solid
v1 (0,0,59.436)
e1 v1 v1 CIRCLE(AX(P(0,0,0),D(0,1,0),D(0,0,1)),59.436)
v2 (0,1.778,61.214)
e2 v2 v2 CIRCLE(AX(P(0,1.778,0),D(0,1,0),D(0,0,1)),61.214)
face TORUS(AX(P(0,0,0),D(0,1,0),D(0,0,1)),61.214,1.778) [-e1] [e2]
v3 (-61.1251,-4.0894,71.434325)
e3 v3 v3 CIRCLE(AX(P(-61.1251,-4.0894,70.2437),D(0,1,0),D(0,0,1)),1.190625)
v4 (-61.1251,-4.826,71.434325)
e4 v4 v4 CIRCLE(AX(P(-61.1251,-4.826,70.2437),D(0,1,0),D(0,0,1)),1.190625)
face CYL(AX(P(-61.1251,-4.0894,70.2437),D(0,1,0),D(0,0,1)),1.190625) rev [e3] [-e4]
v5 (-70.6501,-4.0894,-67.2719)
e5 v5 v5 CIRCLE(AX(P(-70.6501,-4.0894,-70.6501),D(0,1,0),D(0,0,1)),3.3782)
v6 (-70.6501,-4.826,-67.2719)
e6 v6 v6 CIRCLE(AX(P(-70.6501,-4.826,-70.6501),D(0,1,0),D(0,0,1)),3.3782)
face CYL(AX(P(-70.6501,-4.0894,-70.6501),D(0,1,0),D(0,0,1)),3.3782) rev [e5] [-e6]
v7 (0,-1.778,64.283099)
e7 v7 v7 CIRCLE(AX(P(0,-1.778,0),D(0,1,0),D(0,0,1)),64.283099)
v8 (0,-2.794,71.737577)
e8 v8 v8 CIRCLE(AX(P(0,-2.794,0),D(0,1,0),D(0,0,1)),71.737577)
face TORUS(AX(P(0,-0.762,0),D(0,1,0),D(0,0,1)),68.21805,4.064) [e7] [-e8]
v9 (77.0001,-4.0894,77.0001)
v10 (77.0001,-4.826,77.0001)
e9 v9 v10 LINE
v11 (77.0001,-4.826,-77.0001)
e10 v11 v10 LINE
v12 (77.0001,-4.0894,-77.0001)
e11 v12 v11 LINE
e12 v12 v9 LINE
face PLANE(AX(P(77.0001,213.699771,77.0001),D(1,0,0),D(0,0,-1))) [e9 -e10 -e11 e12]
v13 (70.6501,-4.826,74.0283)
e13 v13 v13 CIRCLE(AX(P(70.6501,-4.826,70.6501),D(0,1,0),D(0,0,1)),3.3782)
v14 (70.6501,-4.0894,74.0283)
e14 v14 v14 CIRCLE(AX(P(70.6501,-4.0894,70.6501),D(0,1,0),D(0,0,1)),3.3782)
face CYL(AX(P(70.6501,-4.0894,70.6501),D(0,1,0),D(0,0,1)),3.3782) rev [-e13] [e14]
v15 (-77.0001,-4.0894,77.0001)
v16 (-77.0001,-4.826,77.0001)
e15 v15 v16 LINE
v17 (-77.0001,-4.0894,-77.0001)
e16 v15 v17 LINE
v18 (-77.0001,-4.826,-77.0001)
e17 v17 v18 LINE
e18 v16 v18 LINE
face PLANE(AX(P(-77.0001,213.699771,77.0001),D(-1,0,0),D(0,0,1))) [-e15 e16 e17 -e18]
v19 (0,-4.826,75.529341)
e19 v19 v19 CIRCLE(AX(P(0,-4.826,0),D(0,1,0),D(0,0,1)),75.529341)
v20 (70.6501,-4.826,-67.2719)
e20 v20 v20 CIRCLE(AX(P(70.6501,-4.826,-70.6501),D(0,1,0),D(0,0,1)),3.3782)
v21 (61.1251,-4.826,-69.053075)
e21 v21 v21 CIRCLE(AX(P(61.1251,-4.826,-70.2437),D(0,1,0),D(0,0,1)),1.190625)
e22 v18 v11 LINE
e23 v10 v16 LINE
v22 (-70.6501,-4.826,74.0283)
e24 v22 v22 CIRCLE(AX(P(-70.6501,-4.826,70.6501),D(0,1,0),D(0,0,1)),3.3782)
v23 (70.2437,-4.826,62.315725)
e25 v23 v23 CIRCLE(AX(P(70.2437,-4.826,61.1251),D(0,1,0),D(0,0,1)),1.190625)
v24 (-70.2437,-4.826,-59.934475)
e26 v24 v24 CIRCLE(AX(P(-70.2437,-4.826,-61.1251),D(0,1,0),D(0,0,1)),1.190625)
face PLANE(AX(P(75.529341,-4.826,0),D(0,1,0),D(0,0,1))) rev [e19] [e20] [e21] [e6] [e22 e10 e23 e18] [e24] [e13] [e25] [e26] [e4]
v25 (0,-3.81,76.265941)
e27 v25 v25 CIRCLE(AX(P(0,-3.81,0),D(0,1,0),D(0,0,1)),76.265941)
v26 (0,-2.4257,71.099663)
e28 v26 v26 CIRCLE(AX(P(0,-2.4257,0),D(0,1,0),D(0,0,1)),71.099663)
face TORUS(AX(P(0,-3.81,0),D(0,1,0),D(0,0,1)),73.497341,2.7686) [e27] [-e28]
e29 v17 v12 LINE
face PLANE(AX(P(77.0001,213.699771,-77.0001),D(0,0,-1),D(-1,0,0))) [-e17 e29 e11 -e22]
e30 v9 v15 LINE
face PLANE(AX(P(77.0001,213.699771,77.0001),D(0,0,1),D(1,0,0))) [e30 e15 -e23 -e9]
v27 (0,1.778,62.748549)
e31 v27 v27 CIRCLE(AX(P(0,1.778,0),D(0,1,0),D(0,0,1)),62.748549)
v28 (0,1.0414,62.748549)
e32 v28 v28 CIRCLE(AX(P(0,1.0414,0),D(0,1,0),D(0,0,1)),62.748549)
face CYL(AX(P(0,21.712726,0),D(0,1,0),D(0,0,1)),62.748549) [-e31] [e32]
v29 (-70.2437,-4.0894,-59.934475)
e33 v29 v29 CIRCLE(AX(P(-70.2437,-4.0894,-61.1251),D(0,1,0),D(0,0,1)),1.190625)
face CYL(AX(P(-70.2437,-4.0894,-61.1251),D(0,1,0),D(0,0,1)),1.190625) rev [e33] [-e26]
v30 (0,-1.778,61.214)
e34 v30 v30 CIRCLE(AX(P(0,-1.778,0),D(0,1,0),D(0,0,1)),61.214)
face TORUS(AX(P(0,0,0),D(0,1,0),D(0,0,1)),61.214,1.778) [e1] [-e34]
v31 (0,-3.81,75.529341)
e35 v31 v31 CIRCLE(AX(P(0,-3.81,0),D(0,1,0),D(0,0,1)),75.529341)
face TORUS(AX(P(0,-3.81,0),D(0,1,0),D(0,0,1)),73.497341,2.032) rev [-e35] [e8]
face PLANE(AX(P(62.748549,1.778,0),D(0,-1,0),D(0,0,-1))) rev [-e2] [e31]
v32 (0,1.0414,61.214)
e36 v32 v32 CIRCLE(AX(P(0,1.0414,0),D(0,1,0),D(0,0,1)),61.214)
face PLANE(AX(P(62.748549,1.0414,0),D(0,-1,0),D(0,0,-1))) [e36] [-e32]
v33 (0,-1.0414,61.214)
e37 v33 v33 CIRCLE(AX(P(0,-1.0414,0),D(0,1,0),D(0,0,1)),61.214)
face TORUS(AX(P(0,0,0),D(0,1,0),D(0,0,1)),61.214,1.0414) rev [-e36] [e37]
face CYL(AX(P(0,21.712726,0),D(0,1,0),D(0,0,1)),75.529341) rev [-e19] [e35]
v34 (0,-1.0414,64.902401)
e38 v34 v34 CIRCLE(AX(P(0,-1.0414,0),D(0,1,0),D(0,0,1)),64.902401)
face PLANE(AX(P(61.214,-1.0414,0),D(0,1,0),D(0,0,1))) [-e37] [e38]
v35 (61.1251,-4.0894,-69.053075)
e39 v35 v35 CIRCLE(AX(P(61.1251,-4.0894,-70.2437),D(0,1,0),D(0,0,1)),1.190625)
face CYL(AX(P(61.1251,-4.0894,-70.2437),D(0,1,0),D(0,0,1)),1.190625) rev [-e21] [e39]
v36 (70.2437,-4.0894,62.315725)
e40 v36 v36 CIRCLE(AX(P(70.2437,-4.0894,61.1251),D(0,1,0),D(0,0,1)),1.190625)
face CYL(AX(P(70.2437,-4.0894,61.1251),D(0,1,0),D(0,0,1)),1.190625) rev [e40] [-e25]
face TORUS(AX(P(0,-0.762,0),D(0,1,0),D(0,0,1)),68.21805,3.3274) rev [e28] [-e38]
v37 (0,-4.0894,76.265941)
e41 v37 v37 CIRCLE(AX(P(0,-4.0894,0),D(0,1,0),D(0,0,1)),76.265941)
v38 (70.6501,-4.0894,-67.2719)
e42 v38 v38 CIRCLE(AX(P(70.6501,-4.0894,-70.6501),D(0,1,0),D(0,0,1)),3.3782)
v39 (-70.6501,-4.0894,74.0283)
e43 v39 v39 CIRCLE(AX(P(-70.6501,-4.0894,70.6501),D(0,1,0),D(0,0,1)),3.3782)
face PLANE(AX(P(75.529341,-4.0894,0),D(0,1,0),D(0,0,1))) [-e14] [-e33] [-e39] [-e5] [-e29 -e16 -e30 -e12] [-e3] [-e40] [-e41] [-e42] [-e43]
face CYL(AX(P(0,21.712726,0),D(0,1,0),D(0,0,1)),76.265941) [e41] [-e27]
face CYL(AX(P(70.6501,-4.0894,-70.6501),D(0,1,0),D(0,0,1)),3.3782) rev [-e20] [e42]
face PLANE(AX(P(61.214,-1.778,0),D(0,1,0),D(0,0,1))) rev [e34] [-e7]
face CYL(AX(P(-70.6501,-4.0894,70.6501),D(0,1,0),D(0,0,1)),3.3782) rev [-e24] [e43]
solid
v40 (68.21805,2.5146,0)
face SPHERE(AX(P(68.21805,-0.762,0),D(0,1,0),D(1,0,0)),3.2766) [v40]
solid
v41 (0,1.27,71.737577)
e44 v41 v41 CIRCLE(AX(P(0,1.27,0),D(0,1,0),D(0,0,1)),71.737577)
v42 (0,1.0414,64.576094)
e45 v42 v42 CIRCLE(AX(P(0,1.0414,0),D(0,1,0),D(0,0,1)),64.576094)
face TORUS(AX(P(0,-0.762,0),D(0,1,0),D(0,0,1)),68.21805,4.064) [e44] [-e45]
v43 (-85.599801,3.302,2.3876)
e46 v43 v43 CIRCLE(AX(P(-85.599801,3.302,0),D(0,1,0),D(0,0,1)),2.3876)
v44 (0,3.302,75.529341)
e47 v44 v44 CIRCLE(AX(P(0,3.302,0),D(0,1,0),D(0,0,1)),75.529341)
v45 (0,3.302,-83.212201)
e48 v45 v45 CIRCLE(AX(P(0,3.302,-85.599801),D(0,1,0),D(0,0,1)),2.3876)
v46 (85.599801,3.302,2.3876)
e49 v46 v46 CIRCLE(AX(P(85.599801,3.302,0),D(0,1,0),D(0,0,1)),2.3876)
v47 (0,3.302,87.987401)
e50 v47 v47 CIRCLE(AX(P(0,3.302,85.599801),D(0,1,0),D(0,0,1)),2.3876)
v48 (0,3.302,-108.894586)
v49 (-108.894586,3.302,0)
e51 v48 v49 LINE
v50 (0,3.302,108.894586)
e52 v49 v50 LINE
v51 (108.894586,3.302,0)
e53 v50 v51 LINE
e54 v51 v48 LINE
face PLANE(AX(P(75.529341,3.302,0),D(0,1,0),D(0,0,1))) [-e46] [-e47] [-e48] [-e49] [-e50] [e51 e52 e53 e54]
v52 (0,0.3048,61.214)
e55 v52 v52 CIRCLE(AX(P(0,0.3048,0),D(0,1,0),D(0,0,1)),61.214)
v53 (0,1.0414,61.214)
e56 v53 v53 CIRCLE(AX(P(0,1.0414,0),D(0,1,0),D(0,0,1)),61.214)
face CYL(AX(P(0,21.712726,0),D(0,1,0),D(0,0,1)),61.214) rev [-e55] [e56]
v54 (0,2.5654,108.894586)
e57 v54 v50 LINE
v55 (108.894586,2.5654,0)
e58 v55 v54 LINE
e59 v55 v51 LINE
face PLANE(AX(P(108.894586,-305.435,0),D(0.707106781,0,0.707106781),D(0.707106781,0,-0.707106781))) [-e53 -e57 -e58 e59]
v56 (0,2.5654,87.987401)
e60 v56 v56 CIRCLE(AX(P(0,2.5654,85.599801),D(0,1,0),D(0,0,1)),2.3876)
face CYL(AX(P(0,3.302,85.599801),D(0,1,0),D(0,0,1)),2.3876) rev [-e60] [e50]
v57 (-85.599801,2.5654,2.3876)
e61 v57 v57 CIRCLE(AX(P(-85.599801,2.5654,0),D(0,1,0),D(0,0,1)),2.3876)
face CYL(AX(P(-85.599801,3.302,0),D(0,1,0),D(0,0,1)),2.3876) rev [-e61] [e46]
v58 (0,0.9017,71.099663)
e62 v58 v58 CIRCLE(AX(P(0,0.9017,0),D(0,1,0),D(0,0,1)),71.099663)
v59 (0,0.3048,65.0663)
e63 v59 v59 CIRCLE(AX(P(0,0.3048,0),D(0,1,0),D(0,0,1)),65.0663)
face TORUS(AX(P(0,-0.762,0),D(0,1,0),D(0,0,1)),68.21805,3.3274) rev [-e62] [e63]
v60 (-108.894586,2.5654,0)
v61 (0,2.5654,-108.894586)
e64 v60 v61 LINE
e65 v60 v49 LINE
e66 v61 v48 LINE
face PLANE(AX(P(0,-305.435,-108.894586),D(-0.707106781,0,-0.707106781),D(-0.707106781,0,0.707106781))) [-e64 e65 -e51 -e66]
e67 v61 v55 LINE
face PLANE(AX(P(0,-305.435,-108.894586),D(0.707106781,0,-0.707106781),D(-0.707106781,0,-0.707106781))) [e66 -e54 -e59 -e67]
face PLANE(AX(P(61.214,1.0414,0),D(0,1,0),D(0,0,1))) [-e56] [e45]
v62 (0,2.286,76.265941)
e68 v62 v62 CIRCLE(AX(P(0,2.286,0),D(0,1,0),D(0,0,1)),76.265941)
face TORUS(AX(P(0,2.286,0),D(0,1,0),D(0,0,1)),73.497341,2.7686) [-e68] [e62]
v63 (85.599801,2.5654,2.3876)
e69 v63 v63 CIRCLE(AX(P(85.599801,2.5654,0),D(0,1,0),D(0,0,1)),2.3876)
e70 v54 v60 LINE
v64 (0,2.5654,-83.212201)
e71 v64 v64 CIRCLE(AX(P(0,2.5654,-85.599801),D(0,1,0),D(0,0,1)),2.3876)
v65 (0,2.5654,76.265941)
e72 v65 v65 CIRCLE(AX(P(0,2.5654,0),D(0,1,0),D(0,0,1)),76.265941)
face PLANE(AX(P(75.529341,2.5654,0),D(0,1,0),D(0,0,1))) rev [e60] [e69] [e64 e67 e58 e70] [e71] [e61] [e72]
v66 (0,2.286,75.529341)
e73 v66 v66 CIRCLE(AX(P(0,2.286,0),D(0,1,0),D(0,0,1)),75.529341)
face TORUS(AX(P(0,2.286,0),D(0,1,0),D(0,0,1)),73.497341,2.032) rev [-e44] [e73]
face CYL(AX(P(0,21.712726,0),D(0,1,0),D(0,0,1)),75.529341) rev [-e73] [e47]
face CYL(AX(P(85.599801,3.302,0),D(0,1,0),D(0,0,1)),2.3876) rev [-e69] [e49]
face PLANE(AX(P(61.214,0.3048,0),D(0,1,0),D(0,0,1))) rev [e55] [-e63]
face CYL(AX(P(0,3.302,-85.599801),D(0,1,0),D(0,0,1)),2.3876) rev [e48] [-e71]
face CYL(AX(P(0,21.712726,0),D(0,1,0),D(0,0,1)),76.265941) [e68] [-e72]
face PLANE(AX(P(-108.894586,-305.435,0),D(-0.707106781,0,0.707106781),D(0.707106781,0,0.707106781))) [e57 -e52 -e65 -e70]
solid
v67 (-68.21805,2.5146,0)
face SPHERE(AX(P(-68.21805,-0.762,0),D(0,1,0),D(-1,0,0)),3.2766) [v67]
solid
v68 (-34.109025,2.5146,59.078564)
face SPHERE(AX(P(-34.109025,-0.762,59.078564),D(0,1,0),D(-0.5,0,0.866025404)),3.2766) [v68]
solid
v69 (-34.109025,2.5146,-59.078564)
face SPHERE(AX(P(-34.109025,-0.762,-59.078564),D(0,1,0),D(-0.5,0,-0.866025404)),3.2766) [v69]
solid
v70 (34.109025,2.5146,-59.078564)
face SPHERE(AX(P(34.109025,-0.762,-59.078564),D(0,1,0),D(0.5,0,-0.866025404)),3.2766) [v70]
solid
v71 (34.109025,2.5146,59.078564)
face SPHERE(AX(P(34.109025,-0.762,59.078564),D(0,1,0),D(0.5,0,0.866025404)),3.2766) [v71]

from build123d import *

# Parameters (mm, degrees)
SKETCH2_W                                 = 154.0002
SKETCH2_H                                 = 154.0002
SKETCH2_R                                 = 75.529340861
EXTRUDE1_DEPTH                            = 0.7366
EXTRUDE2_START                            = -0.7366
SKETCH3_R                                 = 75.529340861
EXTRUDE2_DEPTH                            = 0.7366
CIRPATTERN1_COUNT                         = 6
SKETCH5_W                                 = 3.3782
SKETCH5_H                                 = 0.7366
F_5_32_0_156250_DIAMETER_HOLE1_AT_2_COUNT = 2
F_5_32_0_156250_DIAMETER_HOLE1_AT_2_PITCH = 141.3002
F_5_32_0_156250_DIAMETER_HOLE1_AT_3_COUNT = 2
F_5_32_0_156250_DIAMETER_HOLE1_AT_3_PITCH = 141.3002
F_5_32_0_156250_DIAMETER_HOLE1_AT_4_COUNT = 2
F_5_32_0_156250_DIAMETER_HOLE1_AT_4_PITCH = 199.828659206
SKETCH7_W                                 = 2.3876
SKETCH7_H                                 = 8.128
F_5_32_0_156250_DIAMETER_HOLE2_AT_2_COUNT = 2
F_5_32_0_156250_DIAMETER_HOLE2_AT_2_PITCH = 121.0564
F_5_32_0_156250_DIAMETER_HOLE2_AT_3_COUNT = 2
F_5_32_0_156250_DIAMETER_HOLE2_AT_3_PITCH = 171.199602692
F_5_32_0_156250_DIAMETER_HOLE2_AT_4_COUNT = 2
F_5_32_0_156250_DIAMETER_HOLE2_AT_4_PITCH = 121.0564
CIRPATTERN2_COUNT                         = 4


# Read off the part's stored shape, not the designer's step: Revolve-Thin5
with BuildPart() as part:
    # Sketch1 → Revolve-Thin4 (revolve)
    with BuildSketch(Plane.XY, mode=Mode.PRIVATE) as revolve_thin4_sk:
        with BuildLine():
            Line((62.74854946, 1.778), (61.214, 1.778))
            ThreePointArc((61.214, 1.778), (59.436, 0), (61.214, -1.778))
            Line((61.214, -1.778), (64.28309892, -1.778))
            ThreePointArc((64.28309892, -1.778), (67.669225582, -4.788771381), (71.737577241, -2.794))
            ThreePointArc((71.737577241, -2.794), (74.023261161, -1.847238721), (75.529340861, -3.81))
            Line((75.529340861, -3.81), (75.529340861, -4.826))
            Line((75.529340861, -4.826), (77.0001, -4.826))
            Line((77.0001, -4.826), (77.0001, -4.0894))
            Line((77.0001, -4.0894), (76.265940861, -4.0894))
            Line((76.265940861, -4.0894), (76.265940861, -3.81))
            ThreePointArc((76.265940861, -3.81), (74.21390727, -1.135737757), (71.099662929, -2.4257))
            ThreePointArc((71.099662929, -2.4257), (67.492675346, -4.00937161), (64.902401285, -1.0414))
            Line((64.902401285, -1.0414), (61.214, -1.0414))
            ThreePointArc((61.214, -1.0414), (60.1726, 0), (61.214, 1.0414))
            Line((61.214, 1.0414), (62.74854946, 1.0414))
            Line((62.74854946, 1.0414), (62.74854946, 1.778))
        make_face()
    revolve(revolve_thin4_sk.sketch.rotate(Axis((0, 21.71272626, 0), (0, -1, 0)), 90), axis=Axis((0, 21.71272626, 0), (0, -1, 0)))

    # Sketch2 → Extrude1 (add)
    with BuildSketch(Plane.XZ.offset(4.826)):
        Rectangle(SKETCH2_W, SKETCH2_H)
        with Locations(Location((0, 0, 0), (0, 0, 90))):
            Circle(SKETCH2_R, mode=Mode.SUBTRACT)
    extrude(amount=-EXTRUDE1_DEPTH)

    # Sketch5 → 5/32 (0.156250) Diameter Hole1 (revolve, cut)
    with BuildSketch(Plane(origin=(70.6501, -4.0894, -70.6501), x_dir=(0, 0, 1), z_dir=(1, 0, 0))):
        with Locations((1.6891, 0.3683)):
            Rectangle(SKETCH5_W, SKETCH5_H)
    f_5_32_0_156250_diameter_hole1 = revolve(axis=Axis((70.6501, 2.2606, -70.6501), (0, -1, 0)), mode=Mode.SUBTRACT)

    # 5/32 (0.156250) Diameter Hole1 at 2: 5/32 (0.156250) Diameter Hole1 ×2
    with Locations(*[(0, 0, i * F_5_32_0_156250_DIAMETER_HOLE1_AT_2_PITCH) for i in range(1, F_5_32_0_156250_DIAMETER_HOLE1_AT_2_COUNT)]):
        add(f_5_32_0_156250_diameter_hole1, mode=Mode.SUBTRACT)

    # 5/32 (0.156250) Diameter Hole1 at 3: 5/32 (0.156250) Diameter Hole1 ×2
    with Locations(*[(-i * F_5_32_0_156250_DIAMETER_HOLE1_AT_3_PITCH, 0, 0) for i in range(1, F_5_32_0_156250_DIAMETER_HOLE1_AT_3_COUNT)]):
        add(f_5_32_0_156250_diameter_hole1, mode=Mode.SUBTRACT)

    # 5/32 (0.156250) Diameter Hole1 at 4: 5/32 (0.156250) Diameter Hole1 ×2
    with Locations(*[Vector(-0.7071067811865476, 0, 0.7071067811865476) * (i * F_5_32_0_156250_DIAMETER_HOLE1_AT_4_PITCH) for i in range(1, F_5_32_0_156250_DIAMETER_HOLE1_AT_4_COUNT)]):
        add(f_5_32_0_156250_diameter_hole1, mode=Mode.SUBTRACT)

    # Sketch11 → 3/32 (0.093750) Diameter Hole2 (revolve, cut)
    with BuildSketch(Plane(origin=(-70.2437, -4.0894, -61.1251), x_dir=(0, 0, 1), z_dir=(1, 0, 0))):
        Polygon((0, 0), (0, 26.115399675), (1.190625, 25.4), (1.190625, 0), align=None)
    f_3_32_0_093750_diameter_hole2 = revolve(axis=Axis((-70.2437, 2.2606, -61.1251), (0, -1, 0)), mode=Mode.SUBTRACT)

    # CirPattern2: 3/32 (0.093750) Diameter Hole2 ×4 about axis
    cirpattern2_axis = Axis((0, 0, 0), (0, 1, 0))
    for i in range(1, CIRPATTERN2_COUNT):
        add(f_3_32_0_093750_diameter_hole2.rotate(cirpattern2_axis, i * 360 / CIRPATTERN2_COUNT), mode=Mode.SUBTRACT)


with BuildPart() as body_2:
    # Revolve-Thin5 outline → Revolve-Thin5 (revolve)
    with BuildSketch(Plane.XY):
        with BuildLine():
            Line((77.0001, 3.302), (75.529340861, 3.302))
            Line((75.529340861, 3.302), (75.529340861, 2.286))
            ThreePointArc((75.529340861, 2.286), (74.023261161, 0.323238721), (71.737577241, 1.27))
            ThreePointArc((71.737577241, 1.27), (68.088390068, 3.299931105), (64.576093872, 1.0414))
            Line((64.576093872, 1.0414), (61.214, 1.0414))
            Line((61.214, 1.0414), (61.214, 0.3048))
            Line((61.214, 0.3048), (65.066299927, 0.3048))
            ThreePointArc((65.066299927, 0.3048), (67.890458911, 2.54923464), (71.099662929, 0.9017))
            ThreePointArc((71.099662929, 0.9017), (74.21390727, -0.388262243), (76.265940861, 2.286))
            Line((76.265940861, 2.286), (76.265940861, 2.5654))
            Line((76.265940861, 2.5654), (77.0001, 2.5654))
            Line((77.0001, 2.5654), (77.0001, 3.302))
        make_face()
    revolve(axis=Axis((0, 0, 0), (0, 1, 0)))

    # Sketch3 → Extrude2 (add)
    with BuildSketch(Plane(origin=(0, 3.302, 0), x_dir=(-1, 0, 0), z_dir=(0, 1, 0)).offset(EXTRUDE2_START)):
        Polygon((0, -108.894585724), (108.894585724, 0), (0, 108.894585724), (-108.894585724, 0), align=None)
        with Locations(Location((0, 0, 0), (0, 0, 90))):
            Circle(SKETCH3_R, mode=Mode.SUBTRACT)
    extrude(amount=EXTRUDE2_DEPTH)

    # Sketch7 → 5/32 (0.156250) Diameter Hole2 (revolve, cut)
    with BuildSketch(Plane(origin=(85.599801346, 3.302, 0), x_dir=(0, 0, 1), z_dir=(1, 0, 0))):
        with Locations((1.1938, 4.064)):
            Rectangle(SKETCH7_W, SKETCH7_H)
    f_5_32_0_156250_diameter_hole2 = revolve(axis=Axis((85.599801346, 9.652, 0), (0, -1, 0)), mode=Mode.SUBTRACT)

    # 5/32 (0.156250) Diameter Hole2 at 2: 5/32 (0.156250) Diameter Hole2 ×2
    with Locations(*[Vector(-0.7071067811865476, 0, -0.7071067811865476) * (i * F_5_32_0_156250_DIAMETER_HOLE2_AT_2_PITCH) for i in range(1, F_5_32_0_156250_DIAMETER_HOLE2_AT_2_COUNT)]):
        add(f_5_32_0_156250_diameter_hole2, mode=Mode.SUBTRACT)

    # 5/32 (0.156250) Diameter Hole2 at 3: 5/32 (0.156250) Diameter Hole2 ×2
    with Locations(*[(-i * F_5_32_0_156250_DIAMETER_HOLE2_AT_3_PITCH, 0, 0) for i in range(1, F_5_32_0_156250_DIAMETER_HOLE2_AT_3_COUNT)]):
        add(f_5_32_0_156250_diameter_hole2, mode=Mode.SUBTRACT)

    # 5/32 (0.156250) Diameter Hole2 at 4: 5/32 (0.156250) Diameter Hole2 ×2
    with Locations(*[Vector(-0.7071067811865476, 0, 0.7071067811865476) * (i * F_5_32_0_156250_DIAMETER_HOLE2_AT_4_PITCH) for i in range(1, F_5_32_0_156250_DIAMETER_HOLE2_AT_4_COUNT)]):
        add(f_5_32_0_156250_diameter_hole2, mode=Mode.SUBTRACT)


with BuildPart() as body_3:
    # Sketch4 → Revolve1 (revolve)
    with BuildSketch(Plane.XY):
        with BuildLine():
            Line((68.21805, 2.5146), (68.21805, -4.0386))
            ThreePointArc((68.21805, -4.0386), (71.49465, -0.762), (68.21805, 2.5146))
        make_face()
    revolve(axis=Axis((68.21805, 2.837450101, 0), (0, -1, 0)))


with BuildPart() as cirpattern1_1:
    # CirPattern1: pattern copy
    add(body_3.part.rotate(Axis((0, 0, 0), (0, 1, 0)), 1 * 360 / CIRPATTERN1_COUNT))


with BuildPart() as cirpattern1_2:
    # CirPattern1: pattern copy
    add(body_3.part.rotate(Axis((0, 0, 0), (0, 1, 0)), 2 * 360 / CIRPATTERN1_COUNT))


with BuildPart() as cirpattern1_3:
    # CirPattern1: pattern copy
    add(body_3.part.rotate(Axis((0, 0, 0), (0, 1, 0)), 3 * 360 / CIRPATTERN1_COUNT))


with BuildPart() as cirpattern1_4:
    # CirPattern1: pattern copy
    add(body_3.part.rotate(Axis((0, 0, 0), (0, 1, 0)), 4 * 360 / CIRPATTERN1_COUNT))


with BuildPart() as cirpattern1_5:
    # CirPattern1: pattern copy
    add(body_3.part.rotate(Axis((0, 0, 0), (0, 1, 0)), 5 * 360 / CIRPATTERN1_COUNT))


solid = Compound([part.part, body_2.part, body_3.part, cirpattern1_1.part, cirpattern1_2.part, cirpattern1_3.part, cirpattern1_4.part, cirpattern1_5.part])
